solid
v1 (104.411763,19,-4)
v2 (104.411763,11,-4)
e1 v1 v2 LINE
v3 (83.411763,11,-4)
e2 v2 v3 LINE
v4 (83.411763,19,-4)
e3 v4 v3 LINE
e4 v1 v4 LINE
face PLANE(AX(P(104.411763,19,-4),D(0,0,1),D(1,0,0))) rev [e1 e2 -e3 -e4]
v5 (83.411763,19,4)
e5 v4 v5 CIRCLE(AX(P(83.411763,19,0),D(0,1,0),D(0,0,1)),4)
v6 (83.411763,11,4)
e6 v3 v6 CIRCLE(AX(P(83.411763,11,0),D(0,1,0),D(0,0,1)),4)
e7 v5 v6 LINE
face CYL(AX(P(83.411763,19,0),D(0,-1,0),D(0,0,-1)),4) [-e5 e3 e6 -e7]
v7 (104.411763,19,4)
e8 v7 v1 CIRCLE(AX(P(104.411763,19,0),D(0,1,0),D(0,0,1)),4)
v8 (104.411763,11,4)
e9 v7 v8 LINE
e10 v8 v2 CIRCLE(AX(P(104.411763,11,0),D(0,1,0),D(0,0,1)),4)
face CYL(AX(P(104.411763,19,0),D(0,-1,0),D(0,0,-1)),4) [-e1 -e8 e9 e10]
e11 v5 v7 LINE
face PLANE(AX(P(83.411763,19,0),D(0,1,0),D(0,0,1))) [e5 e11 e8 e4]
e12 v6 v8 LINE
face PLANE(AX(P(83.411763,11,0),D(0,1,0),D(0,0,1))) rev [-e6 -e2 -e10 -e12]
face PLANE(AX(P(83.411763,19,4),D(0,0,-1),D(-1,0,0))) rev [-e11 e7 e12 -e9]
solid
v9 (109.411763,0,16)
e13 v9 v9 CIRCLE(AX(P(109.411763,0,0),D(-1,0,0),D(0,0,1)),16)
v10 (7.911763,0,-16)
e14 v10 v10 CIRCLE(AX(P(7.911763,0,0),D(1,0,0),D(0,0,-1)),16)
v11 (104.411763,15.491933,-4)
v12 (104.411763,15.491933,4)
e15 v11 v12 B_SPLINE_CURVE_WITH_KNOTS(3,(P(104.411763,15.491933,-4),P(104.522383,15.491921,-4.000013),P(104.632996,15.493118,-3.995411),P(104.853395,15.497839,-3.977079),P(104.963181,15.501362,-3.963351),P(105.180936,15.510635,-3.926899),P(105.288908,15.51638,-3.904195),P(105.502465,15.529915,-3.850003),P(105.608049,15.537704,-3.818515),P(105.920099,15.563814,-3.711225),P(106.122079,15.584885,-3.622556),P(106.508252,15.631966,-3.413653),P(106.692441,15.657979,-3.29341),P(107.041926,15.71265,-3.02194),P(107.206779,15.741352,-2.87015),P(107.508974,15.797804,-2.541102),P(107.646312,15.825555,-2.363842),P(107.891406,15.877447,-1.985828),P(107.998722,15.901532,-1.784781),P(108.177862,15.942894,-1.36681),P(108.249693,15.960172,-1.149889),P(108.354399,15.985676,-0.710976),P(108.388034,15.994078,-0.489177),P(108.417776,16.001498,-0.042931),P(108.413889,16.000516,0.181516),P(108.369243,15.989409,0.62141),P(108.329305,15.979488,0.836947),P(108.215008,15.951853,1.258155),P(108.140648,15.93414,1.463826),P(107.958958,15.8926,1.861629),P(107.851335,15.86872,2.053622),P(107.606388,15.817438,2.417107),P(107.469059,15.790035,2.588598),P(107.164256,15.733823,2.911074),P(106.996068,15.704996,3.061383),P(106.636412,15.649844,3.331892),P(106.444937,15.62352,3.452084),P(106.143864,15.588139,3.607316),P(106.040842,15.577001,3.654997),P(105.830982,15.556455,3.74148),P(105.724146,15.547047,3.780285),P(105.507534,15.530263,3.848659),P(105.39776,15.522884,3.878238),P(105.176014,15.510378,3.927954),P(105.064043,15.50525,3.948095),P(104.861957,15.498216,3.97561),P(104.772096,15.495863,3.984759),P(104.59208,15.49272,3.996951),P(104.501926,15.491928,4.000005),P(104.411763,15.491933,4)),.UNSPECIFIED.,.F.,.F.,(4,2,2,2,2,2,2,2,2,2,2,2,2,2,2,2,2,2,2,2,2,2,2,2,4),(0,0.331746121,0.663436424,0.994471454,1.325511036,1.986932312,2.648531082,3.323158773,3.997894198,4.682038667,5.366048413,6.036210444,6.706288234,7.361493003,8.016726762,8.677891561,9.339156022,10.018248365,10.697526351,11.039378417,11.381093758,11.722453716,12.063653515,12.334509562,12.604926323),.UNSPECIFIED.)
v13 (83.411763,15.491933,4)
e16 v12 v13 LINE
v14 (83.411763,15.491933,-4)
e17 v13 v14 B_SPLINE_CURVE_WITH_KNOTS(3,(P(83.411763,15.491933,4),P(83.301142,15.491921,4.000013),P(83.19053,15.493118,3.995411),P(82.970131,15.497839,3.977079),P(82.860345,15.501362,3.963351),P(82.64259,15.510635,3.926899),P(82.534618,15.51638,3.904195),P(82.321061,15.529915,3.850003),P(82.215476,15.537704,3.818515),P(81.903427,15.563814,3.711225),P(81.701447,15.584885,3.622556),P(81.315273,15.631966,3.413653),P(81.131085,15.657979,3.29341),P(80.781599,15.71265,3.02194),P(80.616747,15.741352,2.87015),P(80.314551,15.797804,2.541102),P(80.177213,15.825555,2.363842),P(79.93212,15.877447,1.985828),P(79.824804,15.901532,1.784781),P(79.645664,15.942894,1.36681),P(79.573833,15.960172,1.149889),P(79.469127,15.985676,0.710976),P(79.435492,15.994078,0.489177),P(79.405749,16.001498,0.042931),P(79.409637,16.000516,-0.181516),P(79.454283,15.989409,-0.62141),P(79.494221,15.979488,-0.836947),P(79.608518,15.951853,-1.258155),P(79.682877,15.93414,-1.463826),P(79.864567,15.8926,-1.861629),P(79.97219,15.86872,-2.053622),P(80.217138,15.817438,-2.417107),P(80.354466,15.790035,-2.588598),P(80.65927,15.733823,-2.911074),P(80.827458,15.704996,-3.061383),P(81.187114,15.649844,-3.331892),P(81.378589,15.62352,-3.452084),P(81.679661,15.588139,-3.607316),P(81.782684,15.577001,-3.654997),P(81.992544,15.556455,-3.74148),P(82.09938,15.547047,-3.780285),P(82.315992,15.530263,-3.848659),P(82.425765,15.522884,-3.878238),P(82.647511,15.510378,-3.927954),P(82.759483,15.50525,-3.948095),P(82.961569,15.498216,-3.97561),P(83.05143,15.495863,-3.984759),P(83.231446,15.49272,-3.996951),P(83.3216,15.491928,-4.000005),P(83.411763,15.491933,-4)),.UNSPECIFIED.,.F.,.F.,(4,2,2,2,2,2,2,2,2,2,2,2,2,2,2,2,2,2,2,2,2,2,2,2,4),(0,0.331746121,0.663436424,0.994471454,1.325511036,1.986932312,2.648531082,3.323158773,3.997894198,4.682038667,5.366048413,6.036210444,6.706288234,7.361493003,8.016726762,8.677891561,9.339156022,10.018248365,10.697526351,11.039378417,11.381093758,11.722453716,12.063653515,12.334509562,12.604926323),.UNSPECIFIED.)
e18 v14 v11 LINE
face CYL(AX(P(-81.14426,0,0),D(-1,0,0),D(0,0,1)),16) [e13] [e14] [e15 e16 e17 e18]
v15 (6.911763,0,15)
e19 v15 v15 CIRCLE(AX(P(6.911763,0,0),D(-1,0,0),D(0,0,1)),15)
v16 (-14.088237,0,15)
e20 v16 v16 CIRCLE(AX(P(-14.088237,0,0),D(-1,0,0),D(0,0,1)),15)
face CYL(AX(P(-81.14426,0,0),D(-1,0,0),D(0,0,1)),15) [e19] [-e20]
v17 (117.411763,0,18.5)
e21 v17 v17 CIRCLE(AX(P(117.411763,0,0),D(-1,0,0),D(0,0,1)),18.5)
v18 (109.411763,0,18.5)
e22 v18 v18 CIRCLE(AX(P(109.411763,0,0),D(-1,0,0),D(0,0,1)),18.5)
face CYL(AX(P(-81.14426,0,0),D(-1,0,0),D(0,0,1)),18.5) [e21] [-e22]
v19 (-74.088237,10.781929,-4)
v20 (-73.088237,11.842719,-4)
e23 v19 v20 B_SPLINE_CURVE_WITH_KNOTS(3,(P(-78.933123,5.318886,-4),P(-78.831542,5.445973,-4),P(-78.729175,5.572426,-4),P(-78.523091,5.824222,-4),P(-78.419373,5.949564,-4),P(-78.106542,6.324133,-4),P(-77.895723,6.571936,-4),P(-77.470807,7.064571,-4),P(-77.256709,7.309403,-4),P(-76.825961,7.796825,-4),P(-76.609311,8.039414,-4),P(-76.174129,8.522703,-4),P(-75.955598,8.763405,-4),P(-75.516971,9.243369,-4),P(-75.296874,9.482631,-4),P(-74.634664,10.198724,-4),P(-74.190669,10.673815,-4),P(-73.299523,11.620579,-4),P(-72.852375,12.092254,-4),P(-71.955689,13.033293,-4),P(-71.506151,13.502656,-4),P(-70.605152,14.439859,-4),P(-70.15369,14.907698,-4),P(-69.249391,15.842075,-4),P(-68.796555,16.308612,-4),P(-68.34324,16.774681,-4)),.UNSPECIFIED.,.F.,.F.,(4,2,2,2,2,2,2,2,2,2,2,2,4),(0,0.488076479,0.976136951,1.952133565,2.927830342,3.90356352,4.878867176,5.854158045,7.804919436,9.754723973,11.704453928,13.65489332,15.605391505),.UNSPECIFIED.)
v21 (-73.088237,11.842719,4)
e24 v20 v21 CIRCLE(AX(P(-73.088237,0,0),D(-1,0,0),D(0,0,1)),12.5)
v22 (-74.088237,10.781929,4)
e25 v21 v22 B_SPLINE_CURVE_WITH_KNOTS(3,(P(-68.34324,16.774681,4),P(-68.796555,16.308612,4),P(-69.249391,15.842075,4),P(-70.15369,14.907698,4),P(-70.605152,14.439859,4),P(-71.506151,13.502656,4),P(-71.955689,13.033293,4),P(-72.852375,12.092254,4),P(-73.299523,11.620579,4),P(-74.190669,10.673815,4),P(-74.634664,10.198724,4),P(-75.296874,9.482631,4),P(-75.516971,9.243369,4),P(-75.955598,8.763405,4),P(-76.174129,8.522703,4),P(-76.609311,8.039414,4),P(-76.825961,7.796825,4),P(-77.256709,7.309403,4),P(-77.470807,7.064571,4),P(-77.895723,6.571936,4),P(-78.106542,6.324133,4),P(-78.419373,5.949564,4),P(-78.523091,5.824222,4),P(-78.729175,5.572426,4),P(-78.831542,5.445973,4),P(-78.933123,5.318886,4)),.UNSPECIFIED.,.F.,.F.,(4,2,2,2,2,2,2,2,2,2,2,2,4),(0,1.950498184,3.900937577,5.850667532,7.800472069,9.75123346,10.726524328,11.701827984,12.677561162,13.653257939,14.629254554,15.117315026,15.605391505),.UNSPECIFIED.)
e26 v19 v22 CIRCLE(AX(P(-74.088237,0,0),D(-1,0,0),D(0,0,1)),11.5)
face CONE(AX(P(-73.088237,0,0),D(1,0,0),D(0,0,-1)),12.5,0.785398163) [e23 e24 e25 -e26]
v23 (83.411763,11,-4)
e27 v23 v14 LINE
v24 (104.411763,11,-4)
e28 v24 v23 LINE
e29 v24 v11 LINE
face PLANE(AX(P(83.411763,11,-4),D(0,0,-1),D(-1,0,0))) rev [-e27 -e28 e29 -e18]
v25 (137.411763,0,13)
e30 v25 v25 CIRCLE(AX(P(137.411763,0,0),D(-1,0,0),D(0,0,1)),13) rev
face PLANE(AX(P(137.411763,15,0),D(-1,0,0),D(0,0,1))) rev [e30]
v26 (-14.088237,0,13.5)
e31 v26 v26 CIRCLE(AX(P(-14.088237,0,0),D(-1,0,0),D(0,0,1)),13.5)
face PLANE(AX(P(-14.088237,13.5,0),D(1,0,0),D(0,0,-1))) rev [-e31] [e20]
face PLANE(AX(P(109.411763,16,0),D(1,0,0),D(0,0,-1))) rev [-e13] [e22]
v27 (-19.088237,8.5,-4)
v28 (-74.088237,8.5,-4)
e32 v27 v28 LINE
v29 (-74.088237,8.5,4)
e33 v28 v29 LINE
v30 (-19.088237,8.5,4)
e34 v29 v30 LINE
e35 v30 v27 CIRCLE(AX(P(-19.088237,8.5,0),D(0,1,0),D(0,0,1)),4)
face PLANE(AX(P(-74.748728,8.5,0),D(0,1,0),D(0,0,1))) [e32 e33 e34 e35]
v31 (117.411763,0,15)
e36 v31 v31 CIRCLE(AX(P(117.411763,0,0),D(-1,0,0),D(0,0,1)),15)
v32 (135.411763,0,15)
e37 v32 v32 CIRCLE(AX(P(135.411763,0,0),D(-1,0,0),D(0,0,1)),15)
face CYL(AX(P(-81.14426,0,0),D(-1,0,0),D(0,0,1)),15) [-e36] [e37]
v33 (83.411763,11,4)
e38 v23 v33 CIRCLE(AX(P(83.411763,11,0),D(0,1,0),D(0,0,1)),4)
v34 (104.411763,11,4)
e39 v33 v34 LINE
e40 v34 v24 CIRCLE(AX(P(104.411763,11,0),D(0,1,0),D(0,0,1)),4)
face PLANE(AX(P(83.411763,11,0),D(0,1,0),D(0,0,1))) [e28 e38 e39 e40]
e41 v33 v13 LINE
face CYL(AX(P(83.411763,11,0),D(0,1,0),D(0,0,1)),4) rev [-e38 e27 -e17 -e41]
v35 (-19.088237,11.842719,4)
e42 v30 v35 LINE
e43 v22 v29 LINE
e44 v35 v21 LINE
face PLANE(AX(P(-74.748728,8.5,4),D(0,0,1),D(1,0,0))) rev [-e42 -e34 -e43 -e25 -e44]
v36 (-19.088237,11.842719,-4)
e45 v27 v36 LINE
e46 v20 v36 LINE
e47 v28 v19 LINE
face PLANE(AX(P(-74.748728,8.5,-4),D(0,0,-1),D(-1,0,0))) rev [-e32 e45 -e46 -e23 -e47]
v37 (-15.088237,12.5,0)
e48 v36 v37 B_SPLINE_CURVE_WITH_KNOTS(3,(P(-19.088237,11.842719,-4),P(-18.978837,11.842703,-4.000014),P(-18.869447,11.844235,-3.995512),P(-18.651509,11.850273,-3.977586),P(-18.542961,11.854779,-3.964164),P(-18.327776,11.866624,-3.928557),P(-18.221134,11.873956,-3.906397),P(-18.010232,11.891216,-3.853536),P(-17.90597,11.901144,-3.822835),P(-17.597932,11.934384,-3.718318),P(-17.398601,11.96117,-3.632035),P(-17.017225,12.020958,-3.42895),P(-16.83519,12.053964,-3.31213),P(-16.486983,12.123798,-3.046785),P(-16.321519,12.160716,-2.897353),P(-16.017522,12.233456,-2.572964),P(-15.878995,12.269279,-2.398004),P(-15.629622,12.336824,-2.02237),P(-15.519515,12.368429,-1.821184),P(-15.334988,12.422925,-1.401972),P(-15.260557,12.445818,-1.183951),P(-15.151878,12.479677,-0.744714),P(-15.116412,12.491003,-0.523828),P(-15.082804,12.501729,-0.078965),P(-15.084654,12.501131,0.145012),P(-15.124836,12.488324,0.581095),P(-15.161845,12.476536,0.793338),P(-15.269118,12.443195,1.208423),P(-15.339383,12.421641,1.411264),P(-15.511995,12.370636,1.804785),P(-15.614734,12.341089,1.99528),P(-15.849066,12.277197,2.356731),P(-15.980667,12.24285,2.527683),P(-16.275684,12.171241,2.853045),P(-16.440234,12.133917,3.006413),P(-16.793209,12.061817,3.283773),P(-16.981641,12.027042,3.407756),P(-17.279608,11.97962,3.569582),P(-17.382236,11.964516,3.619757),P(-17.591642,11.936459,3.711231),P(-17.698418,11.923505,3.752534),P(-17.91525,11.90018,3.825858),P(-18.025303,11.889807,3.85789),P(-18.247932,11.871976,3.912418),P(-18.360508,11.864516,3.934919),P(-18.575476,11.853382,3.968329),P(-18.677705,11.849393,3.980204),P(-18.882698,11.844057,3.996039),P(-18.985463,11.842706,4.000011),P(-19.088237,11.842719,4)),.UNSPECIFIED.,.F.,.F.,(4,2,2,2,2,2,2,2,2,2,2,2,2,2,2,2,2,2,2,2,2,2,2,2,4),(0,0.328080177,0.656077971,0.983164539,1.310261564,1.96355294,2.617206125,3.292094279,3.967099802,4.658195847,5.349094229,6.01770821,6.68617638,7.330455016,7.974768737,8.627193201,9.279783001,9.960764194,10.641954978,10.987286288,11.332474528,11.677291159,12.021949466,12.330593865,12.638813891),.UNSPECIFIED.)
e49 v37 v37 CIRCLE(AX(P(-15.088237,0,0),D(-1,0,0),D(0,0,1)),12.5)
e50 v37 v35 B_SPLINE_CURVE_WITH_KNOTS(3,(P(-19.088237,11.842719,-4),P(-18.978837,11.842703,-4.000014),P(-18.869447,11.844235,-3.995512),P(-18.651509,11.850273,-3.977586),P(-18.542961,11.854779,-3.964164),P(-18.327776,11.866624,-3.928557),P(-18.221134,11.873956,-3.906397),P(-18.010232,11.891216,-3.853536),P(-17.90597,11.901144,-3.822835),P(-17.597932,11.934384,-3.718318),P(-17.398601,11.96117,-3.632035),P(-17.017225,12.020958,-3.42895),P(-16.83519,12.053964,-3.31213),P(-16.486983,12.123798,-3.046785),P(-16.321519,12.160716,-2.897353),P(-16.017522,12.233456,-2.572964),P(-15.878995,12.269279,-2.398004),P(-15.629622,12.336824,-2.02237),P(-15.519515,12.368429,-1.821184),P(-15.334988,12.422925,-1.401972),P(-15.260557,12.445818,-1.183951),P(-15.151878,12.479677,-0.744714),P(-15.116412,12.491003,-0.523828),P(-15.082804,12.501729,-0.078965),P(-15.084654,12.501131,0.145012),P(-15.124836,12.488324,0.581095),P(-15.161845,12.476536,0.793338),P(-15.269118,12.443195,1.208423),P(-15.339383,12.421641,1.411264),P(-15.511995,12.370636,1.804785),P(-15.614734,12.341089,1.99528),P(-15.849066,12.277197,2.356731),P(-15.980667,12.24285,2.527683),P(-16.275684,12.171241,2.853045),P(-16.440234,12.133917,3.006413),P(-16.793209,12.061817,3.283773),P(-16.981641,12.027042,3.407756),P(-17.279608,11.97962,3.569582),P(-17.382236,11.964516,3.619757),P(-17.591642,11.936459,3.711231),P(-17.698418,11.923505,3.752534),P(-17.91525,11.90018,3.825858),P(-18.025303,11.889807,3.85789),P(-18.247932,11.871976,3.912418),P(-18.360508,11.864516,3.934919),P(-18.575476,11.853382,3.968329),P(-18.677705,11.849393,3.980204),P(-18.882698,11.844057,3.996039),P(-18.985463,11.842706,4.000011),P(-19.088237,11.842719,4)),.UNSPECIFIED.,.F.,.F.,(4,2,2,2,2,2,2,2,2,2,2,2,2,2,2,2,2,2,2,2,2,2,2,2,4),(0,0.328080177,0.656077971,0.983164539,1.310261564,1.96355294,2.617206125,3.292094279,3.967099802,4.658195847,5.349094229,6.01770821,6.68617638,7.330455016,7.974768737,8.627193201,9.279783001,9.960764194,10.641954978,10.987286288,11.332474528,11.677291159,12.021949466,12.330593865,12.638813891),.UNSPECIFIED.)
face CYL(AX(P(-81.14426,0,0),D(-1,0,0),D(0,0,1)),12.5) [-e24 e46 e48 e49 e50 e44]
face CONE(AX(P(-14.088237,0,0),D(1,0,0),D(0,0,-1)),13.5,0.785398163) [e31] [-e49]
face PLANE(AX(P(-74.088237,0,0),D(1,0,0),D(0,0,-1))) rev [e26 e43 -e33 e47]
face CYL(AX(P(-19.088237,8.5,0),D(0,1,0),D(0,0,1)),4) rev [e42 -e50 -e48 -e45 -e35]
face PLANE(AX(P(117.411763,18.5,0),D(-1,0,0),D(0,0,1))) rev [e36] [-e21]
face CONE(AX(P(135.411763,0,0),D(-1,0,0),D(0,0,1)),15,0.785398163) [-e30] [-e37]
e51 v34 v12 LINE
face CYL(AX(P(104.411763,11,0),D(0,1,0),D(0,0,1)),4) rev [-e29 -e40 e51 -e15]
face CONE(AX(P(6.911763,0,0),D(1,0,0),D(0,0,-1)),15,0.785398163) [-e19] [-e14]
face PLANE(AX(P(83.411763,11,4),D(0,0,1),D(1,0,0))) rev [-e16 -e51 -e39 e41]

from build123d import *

# Parameters (mm, degrees)
CUT_EXTRUDE1_START  = 12.5
CUT_EXTRUDE1_DEPTH  = 4
CHAMFER1_SIZE       = 2
CUT_EXTRUDE2_START  = 16
CUT_EXTRUDE2_DEPTH  = 5
BOSS_EXTRUDE1_DEPTH = 8
CHAMFER2_SIZE       = 1


with BuildPart() as part:
    # Sketch1 → Revolve1 (revolve)
    with BuildSketch(Plane.XY, mode=Mode.PRIVATE) as revolve1_sk:
        Polygon((-74.088237147, 0), (-74.088237147, 11.5), (-73.088237147, 12.5), (-15.088237147, 12.5), (-14.088237147, 13.5), (-14.088237147, 15), (6.911762853, 15), (6.911762853, 16), (109.411762853, 16), (109.411762853, 18.5), (117.411762853, 18.5), (117.411762853, 15), (137.411762853, 15), (137.411762853, 0), align=None)
    revolve(revolve1_sk.sketch.rotate(Axis((-81.144259733, 0, 0), (1, 0, 0)), 90), axis=Axis((-81.144259733, 0, 0), (1, 0, 0)))

    # Sketch2 → Cut-Extrude1 (cut)
    with BuildSketch(Plane(origin=(0, 0, 0), x_dir=(1, 0, 0), z_dir=(0, 1, 0)).offset(CUT_EXTRUDE1_START)):
        with BuildLine():
            Line((-74.748728331, 4), (-19.088237147, 4))
            ThreePointArc((-19.088237147, 4), (-15.088237147, 0), (-19.088237147, -4))
            Line((-19.088237147, -4), (-74.748728331, -4))
            ThreePointArc((-74.748728331, -4), (-78.748728331, 0), (-74.748728331, 4))
        make_face()
    extrude(amount=-CUT_EXTRUDE1_DEPTH, mode=Mode.SUBTRACT)

    # Chamfer1
    chamfer1_edges = [part.edges().sort_by_distance(p)[0] for p in [
        (137.411762853, 0, -15),
    ]]
    chamfer(chamfer1_edges, length=CHAMFER1_SIZE)

    # Sketch3 → Cut-Extrude2 (cut)
    with BuildSketch(Plane(origin=(0, 0, 0), x_dir=(1, 0, 0), z_dir=(0, 1, 0)).offset(CUT_EXTRUDE2_START)):
        with BuildLine():
            Line((83.411762853, 4), (104.411762853, 4))
            ThreePointArc((104.411762853, 4), (108.411762853, 0), (104.411762853, -4))
            Line((104.411762853, -4), (83.411762853, -4))
            ThreePointArc((83.411762853, -4), (79.411762853, 0), (83.411762853, 4))
        make_face()
    extrude(amount=-CUT_EXTRUDE2_DEPTH, mode=Mode.SUBTRACT)

    # Chamfer2
    chamfer2_edges = [part.edges().sort_by_distance(p)[0] for p in [
        (6.911762853, 0, -16),
    ]]
    chamfer(chamfer2_edges, length=CHAMFER2_SIZE - 0.0001)  # a hair under: the kernel refuses the full size


with BuildPart() as body_2:
    # Sketch4 → Boss-Extrude1 (new body)
    with BuildSketch(Plane(origin=(0, 11, 0), x_dir=(1, 0, 0), z_dir=(0, 1, 0))):
        with BuildLine():
            Line((83.411762853, -4), (104.411762853, -4))
            ThreePointArc((104.411762853, -4), (108.411762853, 0), (104.411762853, 4))
            Line((104.411762853, 4), (83.411762853, 4))
            ThreePointArc((83.411762853, 4), (79.411762853, 0), (83.411762853, -4))
        make_face()
    extrude(amount=BOSS_EXTRUDE1_DEPTH)


solid = Compound([part.part, body_2.part])
